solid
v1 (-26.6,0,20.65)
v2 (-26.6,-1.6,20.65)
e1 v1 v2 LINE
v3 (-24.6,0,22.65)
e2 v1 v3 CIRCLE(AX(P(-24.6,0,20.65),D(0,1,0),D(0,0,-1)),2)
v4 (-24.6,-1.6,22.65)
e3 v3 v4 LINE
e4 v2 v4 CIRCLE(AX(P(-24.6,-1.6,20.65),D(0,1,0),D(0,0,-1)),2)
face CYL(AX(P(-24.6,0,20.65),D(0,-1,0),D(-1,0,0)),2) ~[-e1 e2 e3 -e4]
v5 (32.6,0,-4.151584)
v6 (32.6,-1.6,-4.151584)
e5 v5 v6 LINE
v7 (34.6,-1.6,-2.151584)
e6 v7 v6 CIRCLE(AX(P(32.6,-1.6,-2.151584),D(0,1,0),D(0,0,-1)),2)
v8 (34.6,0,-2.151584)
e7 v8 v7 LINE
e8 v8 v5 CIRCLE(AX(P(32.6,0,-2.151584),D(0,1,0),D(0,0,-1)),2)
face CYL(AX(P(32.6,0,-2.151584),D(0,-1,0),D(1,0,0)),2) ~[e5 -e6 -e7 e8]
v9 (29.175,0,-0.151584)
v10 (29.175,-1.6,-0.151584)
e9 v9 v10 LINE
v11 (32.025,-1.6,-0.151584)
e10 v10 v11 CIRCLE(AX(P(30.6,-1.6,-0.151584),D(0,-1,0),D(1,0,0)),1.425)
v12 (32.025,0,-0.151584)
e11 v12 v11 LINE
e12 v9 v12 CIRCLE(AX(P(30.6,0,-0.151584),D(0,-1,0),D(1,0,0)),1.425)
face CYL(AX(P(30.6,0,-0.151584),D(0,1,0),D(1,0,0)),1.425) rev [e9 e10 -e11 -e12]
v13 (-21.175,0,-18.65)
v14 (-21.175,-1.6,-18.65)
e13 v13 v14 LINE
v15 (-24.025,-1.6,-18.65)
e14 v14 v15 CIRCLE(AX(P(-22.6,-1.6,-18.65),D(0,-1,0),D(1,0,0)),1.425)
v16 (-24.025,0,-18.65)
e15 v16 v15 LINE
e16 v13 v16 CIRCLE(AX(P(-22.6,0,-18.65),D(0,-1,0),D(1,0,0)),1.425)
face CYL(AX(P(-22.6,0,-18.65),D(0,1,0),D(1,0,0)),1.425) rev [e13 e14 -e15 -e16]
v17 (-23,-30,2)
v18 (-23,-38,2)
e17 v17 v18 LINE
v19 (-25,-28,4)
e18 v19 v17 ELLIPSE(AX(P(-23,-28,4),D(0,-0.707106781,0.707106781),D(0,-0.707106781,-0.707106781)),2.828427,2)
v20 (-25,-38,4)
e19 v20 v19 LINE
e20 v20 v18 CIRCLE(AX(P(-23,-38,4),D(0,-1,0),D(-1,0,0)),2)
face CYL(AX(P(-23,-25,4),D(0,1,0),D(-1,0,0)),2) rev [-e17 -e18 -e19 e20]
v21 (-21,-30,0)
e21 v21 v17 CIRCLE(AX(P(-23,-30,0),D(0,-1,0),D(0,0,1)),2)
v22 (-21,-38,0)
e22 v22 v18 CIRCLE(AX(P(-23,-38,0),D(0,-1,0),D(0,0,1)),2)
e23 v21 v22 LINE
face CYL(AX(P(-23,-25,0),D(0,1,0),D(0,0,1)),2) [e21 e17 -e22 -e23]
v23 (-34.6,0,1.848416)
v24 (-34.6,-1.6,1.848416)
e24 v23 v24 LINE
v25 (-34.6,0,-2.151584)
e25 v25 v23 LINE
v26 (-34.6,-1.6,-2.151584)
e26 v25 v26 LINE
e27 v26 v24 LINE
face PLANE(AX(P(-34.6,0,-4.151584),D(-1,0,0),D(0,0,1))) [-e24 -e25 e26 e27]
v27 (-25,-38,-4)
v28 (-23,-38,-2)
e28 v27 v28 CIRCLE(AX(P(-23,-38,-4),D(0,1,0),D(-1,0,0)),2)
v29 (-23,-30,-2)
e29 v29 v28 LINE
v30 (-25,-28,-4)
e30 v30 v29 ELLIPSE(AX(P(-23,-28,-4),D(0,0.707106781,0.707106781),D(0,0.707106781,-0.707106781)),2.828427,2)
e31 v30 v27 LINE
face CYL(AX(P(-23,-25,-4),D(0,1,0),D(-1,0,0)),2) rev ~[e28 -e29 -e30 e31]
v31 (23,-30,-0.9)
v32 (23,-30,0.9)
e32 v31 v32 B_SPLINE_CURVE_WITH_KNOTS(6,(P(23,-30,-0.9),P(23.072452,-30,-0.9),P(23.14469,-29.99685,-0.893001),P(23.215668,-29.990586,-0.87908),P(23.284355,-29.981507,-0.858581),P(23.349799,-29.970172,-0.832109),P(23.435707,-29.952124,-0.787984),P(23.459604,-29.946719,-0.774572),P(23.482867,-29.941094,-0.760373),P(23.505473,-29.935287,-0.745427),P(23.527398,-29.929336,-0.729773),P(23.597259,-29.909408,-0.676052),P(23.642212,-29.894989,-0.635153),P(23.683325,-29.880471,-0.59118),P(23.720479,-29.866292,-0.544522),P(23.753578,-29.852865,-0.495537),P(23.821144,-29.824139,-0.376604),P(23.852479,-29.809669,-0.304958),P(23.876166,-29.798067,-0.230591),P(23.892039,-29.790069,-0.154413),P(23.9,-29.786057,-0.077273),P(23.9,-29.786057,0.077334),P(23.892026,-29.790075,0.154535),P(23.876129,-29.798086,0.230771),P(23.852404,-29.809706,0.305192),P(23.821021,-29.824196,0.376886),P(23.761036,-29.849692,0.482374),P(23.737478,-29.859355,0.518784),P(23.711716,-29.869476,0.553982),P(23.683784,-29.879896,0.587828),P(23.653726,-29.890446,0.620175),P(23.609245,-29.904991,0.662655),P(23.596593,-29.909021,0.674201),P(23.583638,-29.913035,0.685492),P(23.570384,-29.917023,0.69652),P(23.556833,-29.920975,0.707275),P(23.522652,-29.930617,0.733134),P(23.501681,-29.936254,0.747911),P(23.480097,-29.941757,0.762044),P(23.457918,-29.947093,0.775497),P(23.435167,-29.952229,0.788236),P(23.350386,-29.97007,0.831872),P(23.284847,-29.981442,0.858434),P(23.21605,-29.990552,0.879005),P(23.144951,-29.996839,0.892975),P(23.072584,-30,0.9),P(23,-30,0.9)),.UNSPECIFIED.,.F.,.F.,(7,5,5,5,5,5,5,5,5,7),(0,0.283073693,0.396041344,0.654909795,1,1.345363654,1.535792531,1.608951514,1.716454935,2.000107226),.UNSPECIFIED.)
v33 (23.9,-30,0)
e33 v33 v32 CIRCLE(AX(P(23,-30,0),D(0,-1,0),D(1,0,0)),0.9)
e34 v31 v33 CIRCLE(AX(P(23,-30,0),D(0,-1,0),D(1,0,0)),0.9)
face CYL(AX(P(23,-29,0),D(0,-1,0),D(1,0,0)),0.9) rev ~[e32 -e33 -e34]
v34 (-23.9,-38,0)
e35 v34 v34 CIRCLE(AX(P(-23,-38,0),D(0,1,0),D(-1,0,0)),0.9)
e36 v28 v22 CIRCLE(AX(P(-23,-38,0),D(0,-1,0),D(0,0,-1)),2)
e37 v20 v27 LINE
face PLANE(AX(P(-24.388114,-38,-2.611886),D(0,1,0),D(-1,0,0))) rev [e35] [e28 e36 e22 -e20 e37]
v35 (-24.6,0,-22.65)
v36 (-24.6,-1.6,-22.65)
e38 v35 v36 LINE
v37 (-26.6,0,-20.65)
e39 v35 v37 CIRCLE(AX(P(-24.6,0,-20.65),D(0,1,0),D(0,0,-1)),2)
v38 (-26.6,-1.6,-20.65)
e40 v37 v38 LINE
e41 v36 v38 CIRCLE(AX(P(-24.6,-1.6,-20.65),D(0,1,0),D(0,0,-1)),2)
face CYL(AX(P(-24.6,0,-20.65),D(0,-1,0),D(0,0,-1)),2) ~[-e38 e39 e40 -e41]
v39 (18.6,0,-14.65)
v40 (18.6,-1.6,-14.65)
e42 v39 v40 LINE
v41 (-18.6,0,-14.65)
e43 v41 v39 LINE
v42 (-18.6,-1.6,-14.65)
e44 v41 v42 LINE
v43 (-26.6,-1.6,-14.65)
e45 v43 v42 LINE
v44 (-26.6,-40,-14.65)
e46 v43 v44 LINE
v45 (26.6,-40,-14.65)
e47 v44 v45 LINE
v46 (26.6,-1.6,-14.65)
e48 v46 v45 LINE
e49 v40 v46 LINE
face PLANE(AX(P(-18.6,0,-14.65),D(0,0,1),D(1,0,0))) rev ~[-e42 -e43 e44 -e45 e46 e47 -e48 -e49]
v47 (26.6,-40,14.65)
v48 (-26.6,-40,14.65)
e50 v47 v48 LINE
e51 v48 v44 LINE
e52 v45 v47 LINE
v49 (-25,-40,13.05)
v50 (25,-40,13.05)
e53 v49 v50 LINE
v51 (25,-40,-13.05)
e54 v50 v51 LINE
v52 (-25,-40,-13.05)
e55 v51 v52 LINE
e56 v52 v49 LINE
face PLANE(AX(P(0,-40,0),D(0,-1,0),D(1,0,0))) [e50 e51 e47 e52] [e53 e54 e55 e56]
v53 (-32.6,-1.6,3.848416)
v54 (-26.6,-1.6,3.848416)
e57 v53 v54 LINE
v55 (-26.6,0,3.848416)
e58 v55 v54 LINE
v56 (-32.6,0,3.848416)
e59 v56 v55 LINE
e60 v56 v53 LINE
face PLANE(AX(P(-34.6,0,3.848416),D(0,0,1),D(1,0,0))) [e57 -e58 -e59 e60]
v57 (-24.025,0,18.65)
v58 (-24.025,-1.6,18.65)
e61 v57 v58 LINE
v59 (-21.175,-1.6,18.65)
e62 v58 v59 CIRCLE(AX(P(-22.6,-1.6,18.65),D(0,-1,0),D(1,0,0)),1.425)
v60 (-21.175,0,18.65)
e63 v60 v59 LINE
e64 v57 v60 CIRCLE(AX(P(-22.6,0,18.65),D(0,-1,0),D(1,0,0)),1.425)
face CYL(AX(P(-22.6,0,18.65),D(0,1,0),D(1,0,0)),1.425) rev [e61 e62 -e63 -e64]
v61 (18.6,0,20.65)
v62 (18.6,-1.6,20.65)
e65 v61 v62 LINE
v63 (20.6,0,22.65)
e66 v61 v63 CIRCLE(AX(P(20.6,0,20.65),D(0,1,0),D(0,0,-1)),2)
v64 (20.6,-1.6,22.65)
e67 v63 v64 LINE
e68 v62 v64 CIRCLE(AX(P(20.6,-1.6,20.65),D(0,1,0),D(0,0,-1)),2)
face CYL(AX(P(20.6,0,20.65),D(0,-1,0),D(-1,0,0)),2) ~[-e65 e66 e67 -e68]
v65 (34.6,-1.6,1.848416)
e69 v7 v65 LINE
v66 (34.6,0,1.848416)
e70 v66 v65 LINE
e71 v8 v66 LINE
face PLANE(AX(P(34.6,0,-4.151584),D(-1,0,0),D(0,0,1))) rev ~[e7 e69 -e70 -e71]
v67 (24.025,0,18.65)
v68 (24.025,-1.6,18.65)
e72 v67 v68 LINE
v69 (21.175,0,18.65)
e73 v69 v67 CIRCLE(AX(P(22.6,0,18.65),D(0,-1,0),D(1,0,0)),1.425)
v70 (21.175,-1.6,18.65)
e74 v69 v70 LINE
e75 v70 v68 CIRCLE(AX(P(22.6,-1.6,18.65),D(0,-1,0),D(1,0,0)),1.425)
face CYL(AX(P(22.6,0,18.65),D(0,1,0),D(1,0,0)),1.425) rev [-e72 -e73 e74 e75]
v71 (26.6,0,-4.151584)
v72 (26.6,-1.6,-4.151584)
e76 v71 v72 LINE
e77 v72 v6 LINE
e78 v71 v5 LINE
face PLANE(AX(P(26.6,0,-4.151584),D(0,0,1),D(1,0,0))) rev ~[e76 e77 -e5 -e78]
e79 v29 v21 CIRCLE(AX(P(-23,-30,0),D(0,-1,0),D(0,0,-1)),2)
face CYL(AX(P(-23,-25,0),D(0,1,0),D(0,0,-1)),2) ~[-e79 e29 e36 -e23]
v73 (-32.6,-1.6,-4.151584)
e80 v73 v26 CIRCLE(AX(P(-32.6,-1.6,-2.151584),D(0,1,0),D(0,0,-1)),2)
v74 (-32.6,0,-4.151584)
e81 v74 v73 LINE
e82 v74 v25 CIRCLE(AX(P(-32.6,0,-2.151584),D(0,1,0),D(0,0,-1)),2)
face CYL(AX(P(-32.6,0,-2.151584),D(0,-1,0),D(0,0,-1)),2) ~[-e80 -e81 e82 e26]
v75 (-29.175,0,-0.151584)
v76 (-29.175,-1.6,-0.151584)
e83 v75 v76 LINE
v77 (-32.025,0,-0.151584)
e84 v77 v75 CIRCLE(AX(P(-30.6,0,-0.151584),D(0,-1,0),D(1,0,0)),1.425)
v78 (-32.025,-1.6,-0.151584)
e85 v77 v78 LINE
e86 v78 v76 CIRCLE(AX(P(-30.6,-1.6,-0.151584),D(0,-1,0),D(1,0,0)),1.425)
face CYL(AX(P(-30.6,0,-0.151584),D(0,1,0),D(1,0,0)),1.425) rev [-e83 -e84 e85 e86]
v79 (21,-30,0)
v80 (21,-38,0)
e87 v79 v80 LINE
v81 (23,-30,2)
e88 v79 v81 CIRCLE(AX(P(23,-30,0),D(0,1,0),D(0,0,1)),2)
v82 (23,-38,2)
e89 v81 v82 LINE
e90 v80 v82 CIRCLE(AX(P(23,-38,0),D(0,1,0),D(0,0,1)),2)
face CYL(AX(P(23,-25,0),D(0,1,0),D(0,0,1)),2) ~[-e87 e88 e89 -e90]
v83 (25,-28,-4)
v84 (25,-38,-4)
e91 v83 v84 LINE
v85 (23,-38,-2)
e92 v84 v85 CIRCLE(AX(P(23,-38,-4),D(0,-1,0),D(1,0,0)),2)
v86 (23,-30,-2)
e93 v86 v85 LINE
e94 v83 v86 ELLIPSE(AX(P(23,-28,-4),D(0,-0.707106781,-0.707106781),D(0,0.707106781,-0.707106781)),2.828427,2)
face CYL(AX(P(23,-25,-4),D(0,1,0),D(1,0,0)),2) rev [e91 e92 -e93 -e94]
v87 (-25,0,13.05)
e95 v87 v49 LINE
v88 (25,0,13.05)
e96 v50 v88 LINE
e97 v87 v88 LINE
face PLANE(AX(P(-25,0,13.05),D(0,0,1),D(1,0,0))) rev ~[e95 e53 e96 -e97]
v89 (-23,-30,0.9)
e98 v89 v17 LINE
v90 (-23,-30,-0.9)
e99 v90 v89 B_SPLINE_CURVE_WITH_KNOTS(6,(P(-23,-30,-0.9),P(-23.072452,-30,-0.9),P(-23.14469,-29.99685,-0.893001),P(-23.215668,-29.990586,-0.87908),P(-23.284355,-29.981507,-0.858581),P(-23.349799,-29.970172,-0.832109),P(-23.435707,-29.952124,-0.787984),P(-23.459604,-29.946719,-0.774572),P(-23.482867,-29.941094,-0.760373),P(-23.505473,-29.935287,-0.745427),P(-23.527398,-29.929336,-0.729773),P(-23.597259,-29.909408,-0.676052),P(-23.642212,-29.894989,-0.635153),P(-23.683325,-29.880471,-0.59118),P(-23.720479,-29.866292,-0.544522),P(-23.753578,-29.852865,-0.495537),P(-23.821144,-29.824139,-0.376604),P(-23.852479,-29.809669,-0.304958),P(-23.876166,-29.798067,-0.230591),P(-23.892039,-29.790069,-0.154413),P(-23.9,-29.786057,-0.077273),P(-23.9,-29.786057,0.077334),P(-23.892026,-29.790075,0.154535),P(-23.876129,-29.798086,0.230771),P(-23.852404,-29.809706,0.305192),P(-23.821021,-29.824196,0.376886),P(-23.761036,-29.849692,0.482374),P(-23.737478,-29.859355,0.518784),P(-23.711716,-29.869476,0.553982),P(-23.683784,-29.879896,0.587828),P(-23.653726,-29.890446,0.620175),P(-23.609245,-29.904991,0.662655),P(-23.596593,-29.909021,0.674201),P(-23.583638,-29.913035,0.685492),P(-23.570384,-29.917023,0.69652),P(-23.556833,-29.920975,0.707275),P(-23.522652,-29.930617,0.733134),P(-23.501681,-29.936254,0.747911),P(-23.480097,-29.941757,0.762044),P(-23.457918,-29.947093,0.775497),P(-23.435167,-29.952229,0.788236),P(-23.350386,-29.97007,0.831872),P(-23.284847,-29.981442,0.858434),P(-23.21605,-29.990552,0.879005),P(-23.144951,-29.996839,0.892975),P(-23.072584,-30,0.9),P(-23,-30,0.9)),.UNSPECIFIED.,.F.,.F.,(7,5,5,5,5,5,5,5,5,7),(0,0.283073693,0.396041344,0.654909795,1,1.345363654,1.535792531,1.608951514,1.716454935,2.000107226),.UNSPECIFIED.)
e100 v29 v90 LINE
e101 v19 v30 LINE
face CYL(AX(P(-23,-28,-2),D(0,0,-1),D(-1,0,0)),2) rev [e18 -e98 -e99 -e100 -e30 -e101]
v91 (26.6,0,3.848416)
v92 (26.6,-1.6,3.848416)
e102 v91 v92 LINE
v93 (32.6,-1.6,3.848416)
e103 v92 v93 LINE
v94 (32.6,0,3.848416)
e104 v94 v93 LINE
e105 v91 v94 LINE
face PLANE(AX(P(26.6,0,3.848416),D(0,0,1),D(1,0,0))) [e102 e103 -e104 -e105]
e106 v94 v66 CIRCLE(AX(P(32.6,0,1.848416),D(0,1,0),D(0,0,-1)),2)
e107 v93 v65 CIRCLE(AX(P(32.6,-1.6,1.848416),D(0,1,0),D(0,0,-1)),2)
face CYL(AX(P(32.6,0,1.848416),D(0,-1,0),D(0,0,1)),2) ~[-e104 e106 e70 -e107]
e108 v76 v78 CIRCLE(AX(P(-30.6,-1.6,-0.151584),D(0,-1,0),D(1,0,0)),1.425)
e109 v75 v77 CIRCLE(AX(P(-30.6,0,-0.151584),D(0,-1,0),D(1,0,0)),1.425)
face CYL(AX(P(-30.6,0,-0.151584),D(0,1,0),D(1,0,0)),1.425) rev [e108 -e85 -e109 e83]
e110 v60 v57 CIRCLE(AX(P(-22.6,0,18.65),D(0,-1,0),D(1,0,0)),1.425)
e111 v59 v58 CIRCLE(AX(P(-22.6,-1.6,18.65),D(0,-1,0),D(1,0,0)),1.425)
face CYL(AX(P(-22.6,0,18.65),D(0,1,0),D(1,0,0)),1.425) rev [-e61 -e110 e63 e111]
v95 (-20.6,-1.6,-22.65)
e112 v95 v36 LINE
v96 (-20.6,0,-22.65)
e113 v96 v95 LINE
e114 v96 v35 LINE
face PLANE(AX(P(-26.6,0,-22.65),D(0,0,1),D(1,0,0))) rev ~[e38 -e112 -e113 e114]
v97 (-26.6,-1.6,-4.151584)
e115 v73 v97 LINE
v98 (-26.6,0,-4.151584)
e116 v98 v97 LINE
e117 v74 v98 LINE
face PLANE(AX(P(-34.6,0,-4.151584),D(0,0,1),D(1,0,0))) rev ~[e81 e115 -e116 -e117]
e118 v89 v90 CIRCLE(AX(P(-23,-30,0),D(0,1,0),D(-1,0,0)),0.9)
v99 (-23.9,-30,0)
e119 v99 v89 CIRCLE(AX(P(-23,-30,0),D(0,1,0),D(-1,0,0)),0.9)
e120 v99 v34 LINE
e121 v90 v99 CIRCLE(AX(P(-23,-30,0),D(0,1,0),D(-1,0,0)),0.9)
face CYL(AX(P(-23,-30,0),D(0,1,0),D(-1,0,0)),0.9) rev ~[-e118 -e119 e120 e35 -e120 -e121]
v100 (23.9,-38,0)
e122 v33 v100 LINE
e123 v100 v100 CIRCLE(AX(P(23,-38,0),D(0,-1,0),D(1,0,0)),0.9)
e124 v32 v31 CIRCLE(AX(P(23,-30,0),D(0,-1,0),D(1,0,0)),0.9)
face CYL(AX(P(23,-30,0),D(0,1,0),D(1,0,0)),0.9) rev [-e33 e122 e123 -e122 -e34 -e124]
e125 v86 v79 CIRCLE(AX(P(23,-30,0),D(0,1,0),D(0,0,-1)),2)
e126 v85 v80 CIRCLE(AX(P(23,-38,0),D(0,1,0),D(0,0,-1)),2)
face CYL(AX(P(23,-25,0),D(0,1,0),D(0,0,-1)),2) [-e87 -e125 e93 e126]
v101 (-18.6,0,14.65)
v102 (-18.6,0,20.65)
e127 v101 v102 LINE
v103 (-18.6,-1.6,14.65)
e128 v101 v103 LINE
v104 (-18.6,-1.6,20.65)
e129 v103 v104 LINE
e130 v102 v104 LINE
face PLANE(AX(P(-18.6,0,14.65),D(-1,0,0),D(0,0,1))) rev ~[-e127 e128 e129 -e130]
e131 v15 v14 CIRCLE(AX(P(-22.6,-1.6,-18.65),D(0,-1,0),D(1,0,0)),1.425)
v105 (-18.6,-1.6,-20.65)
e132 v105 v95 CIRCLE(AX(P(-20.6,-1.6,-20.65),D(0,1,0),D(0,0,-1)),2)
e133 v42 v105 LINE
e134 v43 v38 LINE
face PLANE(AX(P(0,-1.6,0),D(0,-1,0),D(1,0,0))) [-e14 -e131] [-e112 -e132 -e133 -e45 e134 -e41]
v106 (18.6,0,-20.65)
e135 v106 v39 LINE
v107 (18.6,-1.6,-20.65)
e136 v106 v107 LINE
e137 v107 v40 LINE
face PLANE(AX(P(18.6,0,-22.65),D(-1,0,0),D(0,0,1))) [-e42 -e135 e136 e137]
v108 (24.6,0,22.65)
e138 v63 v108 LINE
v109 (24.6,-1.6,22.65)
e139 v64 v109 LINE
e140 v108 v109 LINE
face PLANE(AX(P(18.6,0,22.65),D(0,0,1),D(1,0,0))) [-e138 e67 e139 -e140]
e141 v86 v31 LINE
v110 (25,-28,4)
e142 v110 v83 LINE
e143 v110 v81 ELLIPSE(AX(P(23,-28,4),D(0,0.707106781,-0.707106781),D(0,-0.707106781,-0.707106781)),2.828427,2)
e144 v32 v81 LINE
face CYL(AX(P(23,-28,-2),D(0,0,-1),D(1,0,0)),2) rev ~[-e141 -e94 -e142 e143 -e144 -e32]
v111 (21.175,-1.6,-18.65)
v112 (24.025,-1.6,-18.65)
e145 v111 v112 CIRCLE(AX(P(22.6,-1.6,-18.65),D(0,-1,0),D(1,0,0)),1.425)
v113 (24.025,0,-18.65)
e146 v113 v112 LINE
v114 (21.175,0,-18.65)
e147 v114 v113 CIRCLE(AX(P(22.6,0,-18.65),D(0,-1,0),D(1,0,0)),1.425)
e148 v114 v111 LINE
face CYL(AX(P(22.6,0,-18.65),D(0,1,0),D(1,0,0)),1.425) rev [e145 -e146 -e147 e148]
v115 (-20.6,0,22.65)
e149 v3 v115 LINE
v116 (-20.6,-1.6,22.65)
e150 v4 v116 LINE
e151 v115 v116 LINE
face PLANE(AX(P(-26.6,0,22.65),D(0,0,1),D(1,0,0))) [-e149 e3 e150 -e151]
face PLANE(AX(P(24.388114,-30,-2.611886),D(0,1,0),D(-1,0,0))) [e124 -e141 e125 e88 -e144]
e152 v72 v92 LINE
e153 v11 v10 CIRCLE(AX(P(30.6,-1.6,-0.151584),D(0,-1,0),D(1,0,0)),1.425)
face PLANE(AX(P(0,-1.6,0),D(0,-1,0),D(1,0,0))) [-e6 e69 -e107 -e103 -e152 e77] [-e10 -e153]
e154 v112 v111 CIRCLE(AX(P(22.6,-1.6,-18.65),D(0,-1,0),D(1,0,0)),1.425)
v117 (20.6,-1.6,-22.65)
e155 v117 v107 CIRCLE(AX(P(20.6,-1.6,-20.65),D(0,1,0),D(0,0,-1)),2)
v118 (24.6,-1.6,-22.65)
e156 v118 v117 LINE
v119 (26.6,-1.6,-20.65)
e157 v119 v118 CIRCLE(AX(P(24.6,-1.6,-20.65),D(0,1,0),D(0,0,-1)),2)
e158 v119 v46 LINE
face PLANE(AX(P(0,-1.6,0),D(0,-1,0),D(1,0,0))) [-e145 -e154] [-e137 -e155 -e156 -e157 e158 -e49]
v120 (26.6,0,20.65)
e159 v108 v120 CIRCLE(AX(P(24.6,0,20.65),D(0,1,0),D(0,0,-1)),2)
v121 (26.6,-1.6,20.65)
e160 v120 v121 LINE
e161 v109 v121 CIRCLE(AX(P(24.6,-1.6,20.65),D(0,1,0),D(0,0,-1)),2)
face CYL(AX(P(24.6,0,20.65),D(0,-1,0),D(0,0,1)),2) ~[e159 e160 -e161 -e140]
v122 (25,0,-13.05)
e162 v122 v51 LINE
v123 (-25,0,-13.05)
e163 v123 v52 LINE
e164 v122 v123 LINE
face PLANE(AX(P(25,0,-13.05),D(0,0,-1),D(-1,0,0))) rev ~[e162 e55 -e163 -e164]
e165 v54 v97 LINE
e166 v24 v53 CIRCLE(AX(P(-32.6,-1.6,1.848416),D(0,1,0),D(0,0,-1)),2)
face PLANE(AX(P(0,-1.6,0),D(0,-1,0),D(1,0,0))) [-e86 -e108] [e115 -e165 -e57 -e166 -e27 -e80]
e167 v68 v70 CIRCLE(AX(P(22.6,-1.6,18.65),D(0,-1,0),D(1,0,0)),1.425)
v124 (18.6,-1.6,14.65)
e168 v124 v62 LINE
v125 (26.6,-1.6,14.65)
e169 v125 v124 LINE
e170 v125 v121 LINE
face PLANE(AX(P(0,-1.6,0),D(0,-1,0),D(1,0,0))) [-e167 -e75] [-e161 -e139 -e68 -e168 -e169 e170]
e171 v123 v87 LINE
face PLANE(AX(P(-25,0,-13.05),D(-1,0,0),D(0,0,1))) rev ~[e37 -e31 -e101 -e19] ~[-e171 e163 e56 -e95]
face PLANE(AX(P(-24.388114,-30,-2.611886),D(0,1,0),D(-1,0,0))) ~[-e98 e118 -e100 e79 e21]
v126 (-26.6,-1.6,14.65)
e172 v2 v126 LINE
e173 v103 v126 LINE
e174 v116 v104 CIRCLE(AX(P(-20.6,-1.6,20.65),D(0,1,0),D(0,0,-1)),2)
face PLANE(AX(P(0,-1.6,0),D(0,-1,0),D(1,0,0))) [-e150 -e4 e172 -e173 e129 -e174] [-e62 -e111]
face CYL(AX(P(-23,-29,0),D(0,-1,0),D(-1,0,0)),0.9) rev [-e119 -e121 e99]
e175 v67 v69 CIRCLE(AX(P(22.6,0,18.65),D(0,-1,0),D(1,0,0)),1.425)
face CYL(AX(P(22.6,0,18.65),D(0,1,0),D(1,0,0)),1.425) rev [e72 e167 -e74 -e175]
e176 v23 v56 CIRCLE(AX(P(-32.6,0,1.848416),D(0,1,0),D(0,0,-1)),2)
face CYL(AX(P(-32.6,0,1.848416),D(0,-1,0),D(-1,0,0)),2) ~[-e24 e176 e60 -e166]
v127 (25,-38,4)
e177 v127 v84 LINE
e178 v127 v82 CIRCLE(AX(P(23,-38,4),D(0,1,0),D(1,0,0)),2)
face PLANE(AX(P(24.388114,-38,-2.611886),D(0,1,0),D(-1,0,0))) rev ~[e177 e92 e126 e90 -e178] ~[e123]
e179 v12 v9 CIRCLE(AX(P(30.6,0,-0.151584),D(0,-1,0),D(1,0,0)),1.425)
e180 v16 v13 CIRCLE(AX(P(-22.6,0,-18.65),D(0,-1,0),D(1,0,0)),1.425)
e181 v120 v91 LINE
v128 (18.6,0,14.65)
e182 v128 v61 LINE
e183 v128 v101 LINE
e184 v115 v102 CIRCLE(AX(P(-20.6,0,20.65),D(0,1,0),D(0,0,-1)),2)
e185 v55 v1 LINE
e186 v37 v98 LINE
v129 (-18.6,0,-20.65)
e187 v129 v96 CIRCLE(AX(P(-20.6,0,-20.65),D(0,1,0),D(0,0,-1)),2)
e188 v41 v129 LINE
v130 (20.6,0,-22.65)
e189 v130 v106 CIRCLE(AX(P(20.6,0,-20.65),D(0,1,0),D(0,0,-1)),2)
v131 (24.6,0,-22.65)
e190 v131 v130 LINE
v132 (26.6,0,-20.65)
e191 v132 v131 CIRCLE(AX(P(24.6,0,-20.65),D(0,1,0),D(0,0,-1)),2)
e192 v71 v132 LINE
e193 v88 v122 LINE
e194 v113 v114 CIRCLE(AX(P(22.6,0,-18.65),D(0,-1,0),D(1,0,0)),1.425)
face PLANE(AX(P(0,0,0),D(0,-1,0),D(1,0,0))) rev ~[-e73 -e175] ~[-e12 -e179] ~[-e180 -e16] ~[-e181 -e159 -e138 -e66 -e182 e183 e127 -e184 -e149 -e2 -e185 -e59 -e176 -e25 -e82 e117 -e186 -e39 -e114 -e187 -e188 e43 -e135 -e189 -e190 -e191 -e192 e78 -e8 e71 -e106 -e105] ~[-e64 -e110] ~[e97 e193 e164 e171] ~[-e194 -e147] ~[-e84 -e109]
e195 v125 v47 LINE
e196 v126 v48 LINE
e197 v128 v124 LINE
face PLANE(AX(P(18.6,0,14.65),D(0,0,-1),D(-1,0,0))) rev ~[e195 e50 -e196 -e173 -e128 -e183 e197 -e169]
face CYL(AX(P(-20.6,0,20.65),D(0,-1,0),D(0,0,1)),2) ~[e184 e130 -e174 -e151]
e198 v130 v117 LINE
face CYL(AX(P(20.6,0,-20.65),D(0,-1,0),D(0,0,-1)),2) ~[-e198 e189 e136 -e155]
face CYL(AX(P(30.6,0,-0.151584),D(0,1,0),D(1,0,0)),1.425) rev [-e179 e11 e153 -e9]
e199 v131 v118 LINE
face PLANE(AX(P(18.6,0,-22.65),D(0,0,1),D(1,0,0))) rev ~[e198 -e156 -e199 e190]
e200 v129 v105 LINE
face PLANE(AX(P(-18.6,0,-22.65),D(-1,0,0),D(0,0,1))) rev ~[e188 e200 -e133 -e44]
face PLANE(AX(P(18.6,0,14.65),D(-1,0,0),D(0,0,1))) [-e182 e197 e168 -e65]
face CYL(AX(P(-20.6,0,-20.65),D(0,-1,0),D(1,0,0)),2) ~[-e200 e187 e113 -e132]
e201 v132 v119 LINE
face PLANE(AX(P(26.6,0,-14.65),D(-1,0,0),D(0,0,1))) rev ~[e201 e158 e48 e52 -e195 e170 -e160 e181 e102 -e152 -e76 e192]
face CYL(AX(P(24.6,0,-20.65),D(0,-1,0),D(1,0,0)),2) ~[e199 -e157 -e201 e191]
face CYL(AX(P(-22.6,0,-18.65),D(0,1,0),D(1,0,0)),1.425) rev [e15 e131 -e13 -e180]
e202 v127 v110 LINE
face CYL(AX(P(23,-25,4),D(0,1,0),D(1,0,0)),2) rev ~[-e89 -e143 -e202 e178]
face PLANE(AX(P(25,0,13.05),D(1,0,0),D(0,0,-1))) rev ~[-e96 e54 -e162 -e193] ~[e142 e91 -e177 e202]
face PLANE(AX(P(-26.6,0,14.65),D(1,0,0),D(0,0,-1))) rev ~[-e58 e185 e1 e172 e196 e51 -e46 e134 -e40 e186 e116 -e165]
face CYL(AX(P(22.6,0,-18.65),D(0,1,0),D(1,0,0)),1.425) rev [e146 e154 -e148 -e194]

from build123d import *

# Parameters (mm, degrees)
F1_DEPTH     = 40
F0_W         = 8
F0_H         = 8
F0_R         = 1.425
F2_DEPTH     = 1.6
F3_R         = 2
F5_R         = 2
F6_START     = 30
F0_W_2       = 4
F0_H_2       = 4
F0_R_2       = 0.9
F6_DEPTH     = 8
F7_T1_DEPTH  = 8
F7_T6_DEPTH  = 4
F7_S7_R      = 0.9
F7_T8_DEPTH  = 4
F7_T13_DEPTH = 9
F7_T17_DEPTH = 13
F7_T24_DEPTH = 9
F7_T28_DEPTH = 13
F7_T31_DEPTH = 18


# Not quite as in the source:
# - a fillet or chamfer that OpenCascade refuses, or shapes differently, is made with other operations: its cross-section is extruded or revolved along the edge and cut away or added


with BuildPart() as f1:
    # F0 (on Front) → F1 (new body)
    with BuildSketch(Plane.XZ):
        Polygon((-26.6, -4.1515841149), (-26.6, -14.65), (-18.6, -14.65), (18.6, -14.65), (26.6, -14.65), (26.6, -4.1515841149), (26.6, 3.8484158851), (26.6, 14.65), (18.6, 14.65), (-18.6, 14.65), (-26.6, 14.65), (-26.6, 3.8484158851), align=None)
        Polygon((25, -2), (25, -13.05), (-25, -13.05), (-25, 13.05), (25, 13.05), (25, 2), align=None, mode=Mode.SUBTRACT)
    extrude(amount=F1_DEPTH)

    # F0 (on Front) → F2 (join)
    with BuildSketch(Plane.XZ):
        Polygon((-26.6, -4.1515841149), (-26.6, -14.65), (-18.6, -14.65), (18.6, -14.65), (26.6, -14.65), (26.6, -4.1515841149), (26.6, 3.8484158851), (26.6, 14.65), (18.6, 14.65), (-18.6, 14.65), (-26.6, 14.65), (-26.6, 3.8484158851), align=None)
        Polygon((25, -2), (25, -13.05), (-25, -13.05), (-25, 13.05), (25, 13.05), (25, 2), align=None, mode=Mode.SUBTRACT)
        with Locations((-22.6, -18.65)):
            Rectangle(F0_W, F0_H)
        with Locations((-22.6, -18.65)):
            Circle(F0_R, mode=Mode.SUBTRACT)
        with Locations((-30.6, -0.1515841149)):
            Rectangle(F0_W, F0_H)
        with Locations((-30.6, -0.1515841149)):
            Circle(F0_R, mode=Mode.SUBTRACT)
        with Locations((22.6, -18.65)):
            Rectangle(F0_W, F0_H)
        with Locations((22.6, -18.65)):
            Circle(F0_R, mode=Mode.SUBTRACT)
        with Locations((-22.6, 18.65)):
            Rectangle(F0_W, F0_H)
        with Locations((-22.6, 18.65)):
            Circle(F0_R, mode=Mode.SUBTRACT)
        with Locations((30.6, -0.1515841149)):
            Rectangle(F0_W, F0_H)
        with Locations((30.6, -0.1515841149)):
            Circle(F0_R, mode=Mode.SUBTRACT)
        with Locations((22.6, 18.65)):
            Rectangle(F0_W, F0_H)
        with Locations((22.6, 18.65)):
            Circle(F0_R, mode=Mode.SUBTRACT)
    extrude(amount=F2_DEPTH)

    # F3
    f3_edges = [f1.edges().sort_by_distance(p)[0] for p in [
        (-26.6, -0.8, 22.65),
        (-18.6, -0.8, 22.65),
        (18.6, -0.8, 22.65),
        (26.6, -0.8, 22.65),
        (34.6, -0.8, 3.848416),
        (34.6, -0.8, -4.151584),
        (26.6, -0.8, -22.65),
        (18.6, -0.8, -22.65),
        (-34.6, -0.8, -4.151584),
        (-34.6, -0.8, 3.848416),
        (-26.6, -0.8, -22.65),
    ]]
    fillet(f3_edges, radius=F3_R)

    # F4: F1 across plane


with BuildPart() as f1_1:
    add(f1.part)
    add(f1.part.mirror(Plane.YZ))

    # F5
    f5_edges = [f1_1.edges().sort_by_distance(p)[0] for p in [
        (-18.6, -0.8, -22.65),
        (18.6, -0.8, -22.65),
    ]]
    fillet(f5_edges, radius=F5_R)

    # F0 (on Front) → F6 (join)
    with BuildSketch(Plane.XZ.offset(F6_START)):
        with Locations((23, 0)):
            Rectangle(F0_W_2, F0_H_2)
        with Locations((23, 0)):
            Circle(F0_R_2, mode=Mode.SUBTRACT)
    extrude(amount=F6_DEPTH)

    # F7: fillet of radius 2 on 5 edges, made by hand

    # F7_s2 → F7_t1 (join)
    with BuildSketch(Plane.XZ.offset(30)):
        with BuildLine():
            ThreePointArc((25, -4), (24.4142135624, -2.5857864376), (23, -2))
            Line((23, -2), (25, -2))
            Line((25, -2), (25, -4))
        make_face()
        with BuildLine():
            ThreePointArc((25, 4), (24.4142135624, 2.5857864376), (23, 2))
            Line((23, 2), (25, 2))
            Line((25, 2), (25, 4))
        make_face()
    extrude(amount=F7_T1_DEPTH)


with BuildPart() as f7_tool4:
    # F7_s5 → F7_t6 (new body)
    with BuildSketch(Plane.XY.offset(-2)):
        with BuildLine():
            ThreePointArc((25, -28), (24.4142135624, -29.4142135624), (23, -30))
            Line((23, -30), (25, -30))
            Line((25, -30), (25, -28))
        make_face()
    extrude(amount=F7_T6_DEPTH)

    # F7_s7 → F7_t8 (cut, symmetric)
    with BuildSketch(Plane.XZ.offset(29)):
        with Locations((23, 0)):
            Circle(F7_S7_R)
    extrude(amount=F7_T8_DEPTH, both=True, mode=Mode.SUBTRACT)


with BuildPart() as f1_2:
    add(f1_1.part)

    # F7_t3: union F7_tool4
    add(f7_tool4.part)


with BuildPart() as f7_tool11:
    # F7_s12 → F7_t13 (new body)
    with BuildSketch(Plane.XY.offset(-7)):
        with BuildLine():
            ThreePointArc((25, -28), (24.4142135624, -29.4142135624), (23, -30))
            Line((23, -30), (25, -30))
            Line((25, -30), (25, -28))
        make_face()
    extrude(amount=F7_T13_DEPTH)

    split(bisect_by=Plane.XY.offset(-2), keep=Keep.BOTTOM)


with BuildPart() as f7_tool15:
    # F7_s16 → F7_t17 (new body)
    with BuildSketch(Plane.XZ.offset(25)):
        with BuildLine():
            ThreePointArc((25, -4), (24.4142135624, -2.5857864376), (23, -2))
            Line((23, -2), (25, -2))
            Line((25, -2), (25, -4))
        make_face()
    extrude(amount=F7_T17_DEPTH)

    split(bisect_by=Plane.XZ.offset(30), keep=Keep.BOTTOM)


with BuildPart() as f7_tool11_1:
    add(f7_tool11.part)

    # F7_t19: intersect F7_tool15
    add(f7_tool15.part, mode=Mode.INTERSECT)


with BuildPart() as f1_3:
    add(f1_2.part)

    # F7_t9: union F7_tool11
    add(f7_tool11_1.part)


with BuildPart() as f7_tool22:
    # F7_s23 → F7_t24 (new body)
    with BuildSketch(Plane.XY.offset(-2)):
        with BuildLine():
            ThreePointArc((25, -28), (24.4142135624, -29.4142135624), (23, -30))
            Line((23, -30), (25, -30))
            Line((25, -30), (25, -28))
        make_face()
    extrude(amount=F7_T24_DEPTH)

    split(bisect_by=Plane.XY.offset(2), keep=Keep.TOP)


with BuildPart() as f7_tool26:
    # F7_s27 → F7_t28 (new body)
    with BuildSketch(Plane.XZ.offset(25)):
        with BuildLine():
            ThreePointArc((25, 4), (24.4142135624, 2.5857864376), (23, 2))
            Line((23, 2), (25, 2))
            Line((25, 2), (25, 4))
        make_face()
    extrude(amount=F7_T28_DEPTH)

    split(bisect_by=Plane.XZ.offset(30), keep=Keep.BOTTOM)


with BuildPart() as f7_tool22_1:
    add(f7_tool22.part)

    # F7_t30: intersect F7_tool26
    add(f7_tool26.part, mode=Mode.INTERSECT)


with BuildPart() as f1_4:
    add(f1_3.part)

    # F7_t20: union F7_tool22
    add(f7_tool22_1.part)

    # F7_s32 → F7_t31 (cut)
    with BuildSketch(Plane.XZ.offset(25)):
        with BuildLine():
            ThreePointArc((23, -2), (21.5857864376, -1.4142135624), (21, 0))
            Line((21, 0), (21, -2))
            Line((21, -2), (23, -2))
        make_face()
        with BuildLine():
            ThreePointArc((23, 2), (21.5857864376, 1.4142135624), (21, 0))
            Line((21, 0), (21, 2))
            Line((21, 2), (23, 2))
        make_face()
    extrude(amount=F7_T31_DEPTH, mode=Mode.SUBTRACT)

    # F8: F1 across plane


with BuildPart() as f1_5:
    add(f1_4.part)
    add(f1_4.part.mirror(Plane.YZ))


solid = f1_5.part
